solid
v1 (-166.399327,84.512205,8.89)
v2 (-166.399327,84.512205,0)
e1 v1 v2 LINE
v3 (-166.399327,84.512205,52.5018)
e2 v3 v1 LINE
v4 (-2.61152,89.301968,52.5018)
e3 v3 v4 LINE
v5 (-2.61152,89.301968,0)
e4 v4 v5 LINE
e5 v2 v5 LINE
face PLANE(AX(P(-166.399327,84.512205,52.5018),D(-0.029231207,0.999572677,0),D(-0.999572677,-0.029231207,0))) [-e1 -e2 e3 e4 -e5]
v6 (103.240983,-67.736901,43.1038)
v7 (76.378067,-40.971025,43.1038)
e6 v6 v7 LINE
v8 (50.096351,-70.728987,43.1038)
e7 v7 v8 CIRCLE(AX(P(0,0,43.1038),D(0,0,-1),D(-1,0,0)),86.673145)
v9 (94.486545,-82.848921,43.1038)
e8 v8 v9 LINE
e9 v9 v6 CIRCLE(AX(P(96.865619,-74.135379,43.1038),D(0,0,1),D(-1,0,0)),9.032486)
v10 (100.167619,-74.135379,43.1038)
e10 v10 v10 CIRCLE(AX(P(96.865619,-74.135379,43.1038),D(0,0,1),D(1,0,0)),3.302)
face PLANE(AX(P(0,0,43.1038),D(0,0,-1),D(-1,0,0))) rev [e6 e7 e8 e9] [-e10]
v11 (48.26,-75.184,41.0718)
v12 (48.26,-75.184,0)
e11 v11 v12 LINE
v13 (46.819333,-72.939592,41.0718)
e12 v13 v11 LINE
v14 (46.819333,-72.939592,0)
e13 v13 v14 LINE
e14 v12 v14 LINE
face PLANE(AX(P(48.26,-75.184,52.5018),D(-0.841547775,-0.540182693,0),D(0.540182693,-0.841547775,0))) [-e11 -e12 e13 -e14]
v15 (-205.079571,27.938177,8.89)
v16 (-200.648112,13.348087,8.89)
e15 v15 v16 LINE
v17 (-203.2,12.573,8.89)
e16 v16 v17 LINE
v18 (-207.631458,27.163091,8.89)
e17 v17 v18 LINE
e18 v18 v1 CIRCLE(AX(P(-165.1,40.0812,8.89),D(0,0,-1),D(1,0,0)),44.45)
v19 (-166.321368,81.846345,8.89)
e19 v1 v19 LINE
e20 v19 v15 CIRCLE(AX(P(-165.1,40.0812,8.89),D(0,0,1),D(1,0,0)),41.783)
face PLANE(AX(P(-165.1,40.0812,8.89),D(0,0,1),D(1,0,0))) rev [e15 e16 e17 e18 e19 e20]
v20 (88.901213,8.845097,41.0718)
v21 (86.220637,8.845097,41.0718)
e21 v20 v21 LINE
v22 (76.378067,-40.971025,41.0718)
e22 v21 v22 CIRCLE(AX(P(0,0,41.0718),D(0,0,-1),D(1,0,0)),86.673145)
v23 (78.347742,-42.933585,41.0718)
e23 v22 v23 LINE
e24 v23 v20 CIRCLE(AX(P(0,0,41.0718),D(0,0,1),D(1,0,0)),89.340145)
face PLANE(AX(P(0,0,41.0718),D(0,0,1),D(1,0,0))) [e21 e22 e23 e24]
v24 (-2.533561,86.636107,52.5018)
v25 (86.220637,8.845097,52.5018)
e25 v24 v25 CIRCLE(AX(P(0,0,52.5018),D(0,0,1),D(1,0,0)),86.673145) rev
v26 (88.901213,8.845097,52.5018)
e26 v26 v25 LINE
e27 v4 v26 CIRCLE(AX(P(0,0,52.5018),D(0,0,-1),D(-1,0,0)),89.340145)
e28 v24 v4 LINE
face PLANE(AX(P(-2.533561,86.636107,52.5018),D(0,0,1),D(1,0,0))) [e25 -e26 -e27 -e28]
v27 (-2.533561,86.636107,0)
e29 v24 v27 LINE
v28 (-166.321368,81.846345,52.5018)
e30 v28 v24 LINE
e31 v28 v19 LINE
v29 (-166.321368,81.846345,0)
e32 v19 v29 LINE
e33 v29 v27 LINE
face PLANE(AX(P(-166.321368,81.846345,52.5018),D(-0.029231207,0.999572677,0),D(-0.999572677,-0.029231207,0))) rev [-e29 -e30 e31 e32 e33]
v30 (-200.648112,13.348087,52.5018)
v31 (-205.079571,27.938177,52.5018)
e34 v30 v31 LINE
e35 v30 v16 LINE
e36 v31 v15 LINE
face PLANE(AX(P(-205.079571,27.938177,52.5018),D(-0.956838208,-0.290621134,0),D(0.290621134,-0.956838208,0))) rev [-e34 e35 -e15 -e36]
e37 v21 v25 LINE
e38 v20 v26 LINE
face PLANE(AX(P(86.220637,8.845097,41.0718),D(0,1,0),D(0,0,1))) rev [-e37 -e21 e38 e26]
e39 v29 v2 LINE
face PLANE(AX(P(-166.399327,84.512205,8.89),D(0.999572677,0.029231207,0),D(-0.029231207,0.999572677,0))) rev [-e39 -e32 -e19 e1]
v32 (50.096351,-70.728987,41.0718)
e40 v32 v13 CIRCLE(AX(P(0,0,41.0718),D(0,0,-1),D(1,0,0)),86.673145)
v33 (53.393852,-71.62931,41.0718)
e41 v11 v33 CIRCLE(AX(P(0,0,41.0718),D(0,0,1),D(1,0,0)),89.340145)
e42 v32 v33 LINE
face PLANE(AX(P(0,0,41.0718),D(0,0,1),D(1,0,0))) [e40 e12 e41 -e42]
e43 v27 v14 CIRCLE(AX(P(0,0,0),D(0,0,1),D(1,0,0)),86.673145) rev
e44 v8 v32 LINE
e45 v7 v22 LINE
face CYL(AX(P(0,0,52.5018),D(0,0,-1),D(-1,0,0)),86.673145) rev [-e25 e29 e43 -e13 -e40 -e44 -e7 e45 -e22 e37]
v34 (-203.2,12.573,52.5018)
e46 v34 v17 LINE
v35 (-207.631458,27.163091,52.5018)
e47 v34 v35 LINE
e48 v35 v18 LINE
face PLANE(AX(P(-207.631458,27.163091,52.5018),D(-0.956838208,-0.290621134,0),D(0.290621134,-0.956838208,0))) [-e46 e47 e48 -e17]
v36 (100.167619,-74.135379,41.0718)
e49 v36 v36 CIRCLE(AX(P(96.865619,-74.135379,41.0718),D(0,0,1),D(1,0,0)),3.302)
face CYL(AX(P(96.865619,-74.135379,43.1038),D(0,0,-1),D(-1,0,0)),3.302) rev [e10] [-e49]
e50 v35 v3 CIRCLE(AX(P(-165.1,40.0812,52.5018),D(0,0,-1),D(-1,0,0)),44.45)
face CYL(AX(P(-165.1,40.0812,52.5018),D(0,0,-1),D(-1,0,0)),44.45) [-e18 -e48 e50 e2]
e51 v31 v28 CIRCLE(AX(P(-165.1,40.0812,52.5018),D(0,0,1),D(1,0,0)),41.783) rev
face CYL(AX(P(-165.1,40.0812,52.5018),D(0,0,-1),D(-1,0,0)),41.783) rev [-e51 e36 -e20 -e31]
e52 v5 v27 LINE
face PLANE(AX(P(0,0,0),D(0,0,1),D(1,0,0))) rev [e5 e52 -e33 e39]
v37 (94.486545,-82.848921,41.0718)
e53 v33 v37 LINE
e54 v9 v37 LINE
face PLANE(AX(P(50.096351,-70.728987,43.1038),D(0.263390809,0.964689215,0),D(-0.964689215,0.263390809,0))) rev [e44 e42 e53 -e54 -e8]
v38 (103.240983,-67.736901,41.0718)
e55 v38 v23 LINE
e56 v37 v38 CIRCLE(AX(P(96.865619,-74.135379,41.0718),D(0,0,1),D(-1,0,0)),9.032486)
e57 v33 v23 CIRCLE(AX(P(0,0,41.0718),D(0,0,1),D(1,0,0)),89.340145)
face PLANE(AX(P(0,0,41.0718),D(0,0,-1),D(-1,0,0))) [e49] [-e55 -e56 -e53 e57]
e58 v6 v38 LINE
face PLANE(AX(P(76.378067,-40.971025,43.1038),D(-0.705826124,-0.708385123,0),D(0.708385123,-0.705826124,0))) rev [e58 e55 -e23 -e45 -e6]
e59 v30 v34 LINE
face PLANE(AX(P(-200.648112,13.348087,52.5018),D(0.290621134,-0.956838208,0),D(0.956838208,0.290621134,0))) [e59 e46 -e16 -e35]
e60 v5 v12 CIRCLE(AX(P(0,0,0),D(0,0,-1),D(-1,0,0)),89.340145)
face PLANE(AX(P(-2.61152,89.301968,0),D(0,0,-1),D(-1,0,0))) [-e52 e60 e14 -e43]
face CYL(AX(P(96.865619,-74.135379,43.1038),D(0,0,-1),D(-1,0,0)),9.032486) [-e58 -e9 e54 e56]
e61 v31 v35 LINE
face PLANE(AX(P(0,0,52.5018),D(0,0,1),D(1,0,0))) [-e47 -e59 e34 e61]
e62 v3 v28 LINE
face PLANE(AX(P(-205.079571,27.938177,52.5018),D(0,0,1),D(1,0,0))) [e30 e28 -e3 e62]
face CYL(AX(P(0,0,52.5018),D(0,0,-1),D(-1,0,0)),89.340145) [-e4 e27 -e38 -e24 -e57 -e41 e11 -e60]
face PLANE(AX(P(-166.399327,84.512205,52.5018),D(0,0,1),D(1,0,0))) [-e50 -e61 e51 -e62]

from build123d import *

# Parameters (mm, degrees)
BASE_FLANGE1_DEPTH  = 52.5018
CUT_EXTRUDE1_DEPTH  = 8.89
CUT_EXTRUDE2_START  = -11.43
CUT_EXTRUDE2_DEPTH  = 11.43
SKETCH10_R          = 3.302
BOSS_EXTRUDE2_DEPTH = 2.032


# Sheet-metal steps are written as plain solids
with BuildPart() as part:
    # Sketch2 → Base-Flange1 (new body)
    with BuildSketch(Plane.XY):
        with BuildLine():
            Line((-203.2, 12.573), (-207.631458356, 27.163090613))
            ThreePointArc((-207.631458356, 27.163090613), (-201.190368302, 66.028990192), (-166.399327165, 84.512205491))
            Line((-166.399327165, 84.512205491), (-2.61152029, 89.301967603))
            ThreePointArc((-2.61152029, 89.301967603), (85.351357983, 26.397104888), (48.26, -75.184))
            Line((48.26, -75.184), (46.819332757, -72.939592084))
            ThreePointArc((46.819332757, -72.939592084), (82.803432048, 25.609093195), (-2.533560661, 86.636107274))
            Line((-2.533560661, 86.636107274), (-166.321367535, 81.846345161))
            ThreePointArc((-166.321367535, 81.846345161), (-199.024946204, 64.47212278), (-205.079570854, 27.938177176))
            Line((-205.079570854, 27.938177176), (-200.648112499, 13.348086563))
            Line((-200.648112499, 13.348086563), (-203.2, 12.573))
        make_face()
    extrude(amount=BASE_FLANGE1_DEPTH)

    # Sketch7 → Cut-Extrude1 (cut)
    with BuildSketch(Plane(origin=(0, 0, 0), x_dir=(-1, 0, 0), z_dir=(0, 0, -1))):
        with BuildLine():
            Line((166.399327165, 84.512205491), (166.321367535, 81.846345161))
            ThreePointArc((166.321367535, 81.846345161), (199.024946204, 64.47212278), (205.079570854, 27.938177176))
            Line((205.079570854, 27.938177176), (200.648112499, 13.348086563))
            Line((200.648112499, 13.348086563), (203.2, 12.573))
            Line((203.2, 12.573), (207.631458356, 27.163090613))
            ThreePointArc((207.631458356, 27.163090613), (201.190368302, 66.028990192), (166.399327165, 84.512205491))
        make_face()
    extrude(amount=-CUT_EXTRUDE1_DEPTH, mode=Mode.SUBTRACT)

    # Sketch9 → Cut-Extrude2 (cut)
    with BuildSketch(Plane.XY.offset(52.5018).offset(CUT_EXTRUDE2_START)):
        with BuildLine():
            Line((46.819332757, -72.939592084), (48.26, -75.184))
            ThreePointArc((48.26, -75.184), (80.427121635, -38.89909461), (88.901213224, 8.845097132))
            Line((88.901213224, 8.845097132), (86.220637146, 8.845097132))
            ThreePointArc((86.220637146, 8.845097132), (78.083879549, -37.618370083), (46.819332757, -72.939592084))
        make_face()
    extrude(amount=CUT_EXTRUDE2_DEPTH, mode=Mode.SUBTRACT)

    # Sketch10 → Boss-Extrude2 (add)
    with BuildSketch(Plane.XY.offset(41.0718)):
        with BuildLine():
            Line((76.378066867, -40.971025307), (103.240982904, -67.736900681))
            ThreePointArc((103.240982904, -67.736900681), (104.68136366, -78.663063475), (94.486544869, -82.848920608))
            Line((94.486544869, -82.848920608), (50.096351047, -70.728987162))
            ThreePointArc((50.096351047, -70.728987162), (64.964056756, -57.375128261), (76.378066867, -40.971025307))
        make_face()
        with Locations((96.865618573, -74.135379129)):
            Circle(SKETCH10_R, mode=Mode.SUBTRACT)
    extrude(amount=BOSS_EXTRUDE2_DEPTH)


solid = part.part
